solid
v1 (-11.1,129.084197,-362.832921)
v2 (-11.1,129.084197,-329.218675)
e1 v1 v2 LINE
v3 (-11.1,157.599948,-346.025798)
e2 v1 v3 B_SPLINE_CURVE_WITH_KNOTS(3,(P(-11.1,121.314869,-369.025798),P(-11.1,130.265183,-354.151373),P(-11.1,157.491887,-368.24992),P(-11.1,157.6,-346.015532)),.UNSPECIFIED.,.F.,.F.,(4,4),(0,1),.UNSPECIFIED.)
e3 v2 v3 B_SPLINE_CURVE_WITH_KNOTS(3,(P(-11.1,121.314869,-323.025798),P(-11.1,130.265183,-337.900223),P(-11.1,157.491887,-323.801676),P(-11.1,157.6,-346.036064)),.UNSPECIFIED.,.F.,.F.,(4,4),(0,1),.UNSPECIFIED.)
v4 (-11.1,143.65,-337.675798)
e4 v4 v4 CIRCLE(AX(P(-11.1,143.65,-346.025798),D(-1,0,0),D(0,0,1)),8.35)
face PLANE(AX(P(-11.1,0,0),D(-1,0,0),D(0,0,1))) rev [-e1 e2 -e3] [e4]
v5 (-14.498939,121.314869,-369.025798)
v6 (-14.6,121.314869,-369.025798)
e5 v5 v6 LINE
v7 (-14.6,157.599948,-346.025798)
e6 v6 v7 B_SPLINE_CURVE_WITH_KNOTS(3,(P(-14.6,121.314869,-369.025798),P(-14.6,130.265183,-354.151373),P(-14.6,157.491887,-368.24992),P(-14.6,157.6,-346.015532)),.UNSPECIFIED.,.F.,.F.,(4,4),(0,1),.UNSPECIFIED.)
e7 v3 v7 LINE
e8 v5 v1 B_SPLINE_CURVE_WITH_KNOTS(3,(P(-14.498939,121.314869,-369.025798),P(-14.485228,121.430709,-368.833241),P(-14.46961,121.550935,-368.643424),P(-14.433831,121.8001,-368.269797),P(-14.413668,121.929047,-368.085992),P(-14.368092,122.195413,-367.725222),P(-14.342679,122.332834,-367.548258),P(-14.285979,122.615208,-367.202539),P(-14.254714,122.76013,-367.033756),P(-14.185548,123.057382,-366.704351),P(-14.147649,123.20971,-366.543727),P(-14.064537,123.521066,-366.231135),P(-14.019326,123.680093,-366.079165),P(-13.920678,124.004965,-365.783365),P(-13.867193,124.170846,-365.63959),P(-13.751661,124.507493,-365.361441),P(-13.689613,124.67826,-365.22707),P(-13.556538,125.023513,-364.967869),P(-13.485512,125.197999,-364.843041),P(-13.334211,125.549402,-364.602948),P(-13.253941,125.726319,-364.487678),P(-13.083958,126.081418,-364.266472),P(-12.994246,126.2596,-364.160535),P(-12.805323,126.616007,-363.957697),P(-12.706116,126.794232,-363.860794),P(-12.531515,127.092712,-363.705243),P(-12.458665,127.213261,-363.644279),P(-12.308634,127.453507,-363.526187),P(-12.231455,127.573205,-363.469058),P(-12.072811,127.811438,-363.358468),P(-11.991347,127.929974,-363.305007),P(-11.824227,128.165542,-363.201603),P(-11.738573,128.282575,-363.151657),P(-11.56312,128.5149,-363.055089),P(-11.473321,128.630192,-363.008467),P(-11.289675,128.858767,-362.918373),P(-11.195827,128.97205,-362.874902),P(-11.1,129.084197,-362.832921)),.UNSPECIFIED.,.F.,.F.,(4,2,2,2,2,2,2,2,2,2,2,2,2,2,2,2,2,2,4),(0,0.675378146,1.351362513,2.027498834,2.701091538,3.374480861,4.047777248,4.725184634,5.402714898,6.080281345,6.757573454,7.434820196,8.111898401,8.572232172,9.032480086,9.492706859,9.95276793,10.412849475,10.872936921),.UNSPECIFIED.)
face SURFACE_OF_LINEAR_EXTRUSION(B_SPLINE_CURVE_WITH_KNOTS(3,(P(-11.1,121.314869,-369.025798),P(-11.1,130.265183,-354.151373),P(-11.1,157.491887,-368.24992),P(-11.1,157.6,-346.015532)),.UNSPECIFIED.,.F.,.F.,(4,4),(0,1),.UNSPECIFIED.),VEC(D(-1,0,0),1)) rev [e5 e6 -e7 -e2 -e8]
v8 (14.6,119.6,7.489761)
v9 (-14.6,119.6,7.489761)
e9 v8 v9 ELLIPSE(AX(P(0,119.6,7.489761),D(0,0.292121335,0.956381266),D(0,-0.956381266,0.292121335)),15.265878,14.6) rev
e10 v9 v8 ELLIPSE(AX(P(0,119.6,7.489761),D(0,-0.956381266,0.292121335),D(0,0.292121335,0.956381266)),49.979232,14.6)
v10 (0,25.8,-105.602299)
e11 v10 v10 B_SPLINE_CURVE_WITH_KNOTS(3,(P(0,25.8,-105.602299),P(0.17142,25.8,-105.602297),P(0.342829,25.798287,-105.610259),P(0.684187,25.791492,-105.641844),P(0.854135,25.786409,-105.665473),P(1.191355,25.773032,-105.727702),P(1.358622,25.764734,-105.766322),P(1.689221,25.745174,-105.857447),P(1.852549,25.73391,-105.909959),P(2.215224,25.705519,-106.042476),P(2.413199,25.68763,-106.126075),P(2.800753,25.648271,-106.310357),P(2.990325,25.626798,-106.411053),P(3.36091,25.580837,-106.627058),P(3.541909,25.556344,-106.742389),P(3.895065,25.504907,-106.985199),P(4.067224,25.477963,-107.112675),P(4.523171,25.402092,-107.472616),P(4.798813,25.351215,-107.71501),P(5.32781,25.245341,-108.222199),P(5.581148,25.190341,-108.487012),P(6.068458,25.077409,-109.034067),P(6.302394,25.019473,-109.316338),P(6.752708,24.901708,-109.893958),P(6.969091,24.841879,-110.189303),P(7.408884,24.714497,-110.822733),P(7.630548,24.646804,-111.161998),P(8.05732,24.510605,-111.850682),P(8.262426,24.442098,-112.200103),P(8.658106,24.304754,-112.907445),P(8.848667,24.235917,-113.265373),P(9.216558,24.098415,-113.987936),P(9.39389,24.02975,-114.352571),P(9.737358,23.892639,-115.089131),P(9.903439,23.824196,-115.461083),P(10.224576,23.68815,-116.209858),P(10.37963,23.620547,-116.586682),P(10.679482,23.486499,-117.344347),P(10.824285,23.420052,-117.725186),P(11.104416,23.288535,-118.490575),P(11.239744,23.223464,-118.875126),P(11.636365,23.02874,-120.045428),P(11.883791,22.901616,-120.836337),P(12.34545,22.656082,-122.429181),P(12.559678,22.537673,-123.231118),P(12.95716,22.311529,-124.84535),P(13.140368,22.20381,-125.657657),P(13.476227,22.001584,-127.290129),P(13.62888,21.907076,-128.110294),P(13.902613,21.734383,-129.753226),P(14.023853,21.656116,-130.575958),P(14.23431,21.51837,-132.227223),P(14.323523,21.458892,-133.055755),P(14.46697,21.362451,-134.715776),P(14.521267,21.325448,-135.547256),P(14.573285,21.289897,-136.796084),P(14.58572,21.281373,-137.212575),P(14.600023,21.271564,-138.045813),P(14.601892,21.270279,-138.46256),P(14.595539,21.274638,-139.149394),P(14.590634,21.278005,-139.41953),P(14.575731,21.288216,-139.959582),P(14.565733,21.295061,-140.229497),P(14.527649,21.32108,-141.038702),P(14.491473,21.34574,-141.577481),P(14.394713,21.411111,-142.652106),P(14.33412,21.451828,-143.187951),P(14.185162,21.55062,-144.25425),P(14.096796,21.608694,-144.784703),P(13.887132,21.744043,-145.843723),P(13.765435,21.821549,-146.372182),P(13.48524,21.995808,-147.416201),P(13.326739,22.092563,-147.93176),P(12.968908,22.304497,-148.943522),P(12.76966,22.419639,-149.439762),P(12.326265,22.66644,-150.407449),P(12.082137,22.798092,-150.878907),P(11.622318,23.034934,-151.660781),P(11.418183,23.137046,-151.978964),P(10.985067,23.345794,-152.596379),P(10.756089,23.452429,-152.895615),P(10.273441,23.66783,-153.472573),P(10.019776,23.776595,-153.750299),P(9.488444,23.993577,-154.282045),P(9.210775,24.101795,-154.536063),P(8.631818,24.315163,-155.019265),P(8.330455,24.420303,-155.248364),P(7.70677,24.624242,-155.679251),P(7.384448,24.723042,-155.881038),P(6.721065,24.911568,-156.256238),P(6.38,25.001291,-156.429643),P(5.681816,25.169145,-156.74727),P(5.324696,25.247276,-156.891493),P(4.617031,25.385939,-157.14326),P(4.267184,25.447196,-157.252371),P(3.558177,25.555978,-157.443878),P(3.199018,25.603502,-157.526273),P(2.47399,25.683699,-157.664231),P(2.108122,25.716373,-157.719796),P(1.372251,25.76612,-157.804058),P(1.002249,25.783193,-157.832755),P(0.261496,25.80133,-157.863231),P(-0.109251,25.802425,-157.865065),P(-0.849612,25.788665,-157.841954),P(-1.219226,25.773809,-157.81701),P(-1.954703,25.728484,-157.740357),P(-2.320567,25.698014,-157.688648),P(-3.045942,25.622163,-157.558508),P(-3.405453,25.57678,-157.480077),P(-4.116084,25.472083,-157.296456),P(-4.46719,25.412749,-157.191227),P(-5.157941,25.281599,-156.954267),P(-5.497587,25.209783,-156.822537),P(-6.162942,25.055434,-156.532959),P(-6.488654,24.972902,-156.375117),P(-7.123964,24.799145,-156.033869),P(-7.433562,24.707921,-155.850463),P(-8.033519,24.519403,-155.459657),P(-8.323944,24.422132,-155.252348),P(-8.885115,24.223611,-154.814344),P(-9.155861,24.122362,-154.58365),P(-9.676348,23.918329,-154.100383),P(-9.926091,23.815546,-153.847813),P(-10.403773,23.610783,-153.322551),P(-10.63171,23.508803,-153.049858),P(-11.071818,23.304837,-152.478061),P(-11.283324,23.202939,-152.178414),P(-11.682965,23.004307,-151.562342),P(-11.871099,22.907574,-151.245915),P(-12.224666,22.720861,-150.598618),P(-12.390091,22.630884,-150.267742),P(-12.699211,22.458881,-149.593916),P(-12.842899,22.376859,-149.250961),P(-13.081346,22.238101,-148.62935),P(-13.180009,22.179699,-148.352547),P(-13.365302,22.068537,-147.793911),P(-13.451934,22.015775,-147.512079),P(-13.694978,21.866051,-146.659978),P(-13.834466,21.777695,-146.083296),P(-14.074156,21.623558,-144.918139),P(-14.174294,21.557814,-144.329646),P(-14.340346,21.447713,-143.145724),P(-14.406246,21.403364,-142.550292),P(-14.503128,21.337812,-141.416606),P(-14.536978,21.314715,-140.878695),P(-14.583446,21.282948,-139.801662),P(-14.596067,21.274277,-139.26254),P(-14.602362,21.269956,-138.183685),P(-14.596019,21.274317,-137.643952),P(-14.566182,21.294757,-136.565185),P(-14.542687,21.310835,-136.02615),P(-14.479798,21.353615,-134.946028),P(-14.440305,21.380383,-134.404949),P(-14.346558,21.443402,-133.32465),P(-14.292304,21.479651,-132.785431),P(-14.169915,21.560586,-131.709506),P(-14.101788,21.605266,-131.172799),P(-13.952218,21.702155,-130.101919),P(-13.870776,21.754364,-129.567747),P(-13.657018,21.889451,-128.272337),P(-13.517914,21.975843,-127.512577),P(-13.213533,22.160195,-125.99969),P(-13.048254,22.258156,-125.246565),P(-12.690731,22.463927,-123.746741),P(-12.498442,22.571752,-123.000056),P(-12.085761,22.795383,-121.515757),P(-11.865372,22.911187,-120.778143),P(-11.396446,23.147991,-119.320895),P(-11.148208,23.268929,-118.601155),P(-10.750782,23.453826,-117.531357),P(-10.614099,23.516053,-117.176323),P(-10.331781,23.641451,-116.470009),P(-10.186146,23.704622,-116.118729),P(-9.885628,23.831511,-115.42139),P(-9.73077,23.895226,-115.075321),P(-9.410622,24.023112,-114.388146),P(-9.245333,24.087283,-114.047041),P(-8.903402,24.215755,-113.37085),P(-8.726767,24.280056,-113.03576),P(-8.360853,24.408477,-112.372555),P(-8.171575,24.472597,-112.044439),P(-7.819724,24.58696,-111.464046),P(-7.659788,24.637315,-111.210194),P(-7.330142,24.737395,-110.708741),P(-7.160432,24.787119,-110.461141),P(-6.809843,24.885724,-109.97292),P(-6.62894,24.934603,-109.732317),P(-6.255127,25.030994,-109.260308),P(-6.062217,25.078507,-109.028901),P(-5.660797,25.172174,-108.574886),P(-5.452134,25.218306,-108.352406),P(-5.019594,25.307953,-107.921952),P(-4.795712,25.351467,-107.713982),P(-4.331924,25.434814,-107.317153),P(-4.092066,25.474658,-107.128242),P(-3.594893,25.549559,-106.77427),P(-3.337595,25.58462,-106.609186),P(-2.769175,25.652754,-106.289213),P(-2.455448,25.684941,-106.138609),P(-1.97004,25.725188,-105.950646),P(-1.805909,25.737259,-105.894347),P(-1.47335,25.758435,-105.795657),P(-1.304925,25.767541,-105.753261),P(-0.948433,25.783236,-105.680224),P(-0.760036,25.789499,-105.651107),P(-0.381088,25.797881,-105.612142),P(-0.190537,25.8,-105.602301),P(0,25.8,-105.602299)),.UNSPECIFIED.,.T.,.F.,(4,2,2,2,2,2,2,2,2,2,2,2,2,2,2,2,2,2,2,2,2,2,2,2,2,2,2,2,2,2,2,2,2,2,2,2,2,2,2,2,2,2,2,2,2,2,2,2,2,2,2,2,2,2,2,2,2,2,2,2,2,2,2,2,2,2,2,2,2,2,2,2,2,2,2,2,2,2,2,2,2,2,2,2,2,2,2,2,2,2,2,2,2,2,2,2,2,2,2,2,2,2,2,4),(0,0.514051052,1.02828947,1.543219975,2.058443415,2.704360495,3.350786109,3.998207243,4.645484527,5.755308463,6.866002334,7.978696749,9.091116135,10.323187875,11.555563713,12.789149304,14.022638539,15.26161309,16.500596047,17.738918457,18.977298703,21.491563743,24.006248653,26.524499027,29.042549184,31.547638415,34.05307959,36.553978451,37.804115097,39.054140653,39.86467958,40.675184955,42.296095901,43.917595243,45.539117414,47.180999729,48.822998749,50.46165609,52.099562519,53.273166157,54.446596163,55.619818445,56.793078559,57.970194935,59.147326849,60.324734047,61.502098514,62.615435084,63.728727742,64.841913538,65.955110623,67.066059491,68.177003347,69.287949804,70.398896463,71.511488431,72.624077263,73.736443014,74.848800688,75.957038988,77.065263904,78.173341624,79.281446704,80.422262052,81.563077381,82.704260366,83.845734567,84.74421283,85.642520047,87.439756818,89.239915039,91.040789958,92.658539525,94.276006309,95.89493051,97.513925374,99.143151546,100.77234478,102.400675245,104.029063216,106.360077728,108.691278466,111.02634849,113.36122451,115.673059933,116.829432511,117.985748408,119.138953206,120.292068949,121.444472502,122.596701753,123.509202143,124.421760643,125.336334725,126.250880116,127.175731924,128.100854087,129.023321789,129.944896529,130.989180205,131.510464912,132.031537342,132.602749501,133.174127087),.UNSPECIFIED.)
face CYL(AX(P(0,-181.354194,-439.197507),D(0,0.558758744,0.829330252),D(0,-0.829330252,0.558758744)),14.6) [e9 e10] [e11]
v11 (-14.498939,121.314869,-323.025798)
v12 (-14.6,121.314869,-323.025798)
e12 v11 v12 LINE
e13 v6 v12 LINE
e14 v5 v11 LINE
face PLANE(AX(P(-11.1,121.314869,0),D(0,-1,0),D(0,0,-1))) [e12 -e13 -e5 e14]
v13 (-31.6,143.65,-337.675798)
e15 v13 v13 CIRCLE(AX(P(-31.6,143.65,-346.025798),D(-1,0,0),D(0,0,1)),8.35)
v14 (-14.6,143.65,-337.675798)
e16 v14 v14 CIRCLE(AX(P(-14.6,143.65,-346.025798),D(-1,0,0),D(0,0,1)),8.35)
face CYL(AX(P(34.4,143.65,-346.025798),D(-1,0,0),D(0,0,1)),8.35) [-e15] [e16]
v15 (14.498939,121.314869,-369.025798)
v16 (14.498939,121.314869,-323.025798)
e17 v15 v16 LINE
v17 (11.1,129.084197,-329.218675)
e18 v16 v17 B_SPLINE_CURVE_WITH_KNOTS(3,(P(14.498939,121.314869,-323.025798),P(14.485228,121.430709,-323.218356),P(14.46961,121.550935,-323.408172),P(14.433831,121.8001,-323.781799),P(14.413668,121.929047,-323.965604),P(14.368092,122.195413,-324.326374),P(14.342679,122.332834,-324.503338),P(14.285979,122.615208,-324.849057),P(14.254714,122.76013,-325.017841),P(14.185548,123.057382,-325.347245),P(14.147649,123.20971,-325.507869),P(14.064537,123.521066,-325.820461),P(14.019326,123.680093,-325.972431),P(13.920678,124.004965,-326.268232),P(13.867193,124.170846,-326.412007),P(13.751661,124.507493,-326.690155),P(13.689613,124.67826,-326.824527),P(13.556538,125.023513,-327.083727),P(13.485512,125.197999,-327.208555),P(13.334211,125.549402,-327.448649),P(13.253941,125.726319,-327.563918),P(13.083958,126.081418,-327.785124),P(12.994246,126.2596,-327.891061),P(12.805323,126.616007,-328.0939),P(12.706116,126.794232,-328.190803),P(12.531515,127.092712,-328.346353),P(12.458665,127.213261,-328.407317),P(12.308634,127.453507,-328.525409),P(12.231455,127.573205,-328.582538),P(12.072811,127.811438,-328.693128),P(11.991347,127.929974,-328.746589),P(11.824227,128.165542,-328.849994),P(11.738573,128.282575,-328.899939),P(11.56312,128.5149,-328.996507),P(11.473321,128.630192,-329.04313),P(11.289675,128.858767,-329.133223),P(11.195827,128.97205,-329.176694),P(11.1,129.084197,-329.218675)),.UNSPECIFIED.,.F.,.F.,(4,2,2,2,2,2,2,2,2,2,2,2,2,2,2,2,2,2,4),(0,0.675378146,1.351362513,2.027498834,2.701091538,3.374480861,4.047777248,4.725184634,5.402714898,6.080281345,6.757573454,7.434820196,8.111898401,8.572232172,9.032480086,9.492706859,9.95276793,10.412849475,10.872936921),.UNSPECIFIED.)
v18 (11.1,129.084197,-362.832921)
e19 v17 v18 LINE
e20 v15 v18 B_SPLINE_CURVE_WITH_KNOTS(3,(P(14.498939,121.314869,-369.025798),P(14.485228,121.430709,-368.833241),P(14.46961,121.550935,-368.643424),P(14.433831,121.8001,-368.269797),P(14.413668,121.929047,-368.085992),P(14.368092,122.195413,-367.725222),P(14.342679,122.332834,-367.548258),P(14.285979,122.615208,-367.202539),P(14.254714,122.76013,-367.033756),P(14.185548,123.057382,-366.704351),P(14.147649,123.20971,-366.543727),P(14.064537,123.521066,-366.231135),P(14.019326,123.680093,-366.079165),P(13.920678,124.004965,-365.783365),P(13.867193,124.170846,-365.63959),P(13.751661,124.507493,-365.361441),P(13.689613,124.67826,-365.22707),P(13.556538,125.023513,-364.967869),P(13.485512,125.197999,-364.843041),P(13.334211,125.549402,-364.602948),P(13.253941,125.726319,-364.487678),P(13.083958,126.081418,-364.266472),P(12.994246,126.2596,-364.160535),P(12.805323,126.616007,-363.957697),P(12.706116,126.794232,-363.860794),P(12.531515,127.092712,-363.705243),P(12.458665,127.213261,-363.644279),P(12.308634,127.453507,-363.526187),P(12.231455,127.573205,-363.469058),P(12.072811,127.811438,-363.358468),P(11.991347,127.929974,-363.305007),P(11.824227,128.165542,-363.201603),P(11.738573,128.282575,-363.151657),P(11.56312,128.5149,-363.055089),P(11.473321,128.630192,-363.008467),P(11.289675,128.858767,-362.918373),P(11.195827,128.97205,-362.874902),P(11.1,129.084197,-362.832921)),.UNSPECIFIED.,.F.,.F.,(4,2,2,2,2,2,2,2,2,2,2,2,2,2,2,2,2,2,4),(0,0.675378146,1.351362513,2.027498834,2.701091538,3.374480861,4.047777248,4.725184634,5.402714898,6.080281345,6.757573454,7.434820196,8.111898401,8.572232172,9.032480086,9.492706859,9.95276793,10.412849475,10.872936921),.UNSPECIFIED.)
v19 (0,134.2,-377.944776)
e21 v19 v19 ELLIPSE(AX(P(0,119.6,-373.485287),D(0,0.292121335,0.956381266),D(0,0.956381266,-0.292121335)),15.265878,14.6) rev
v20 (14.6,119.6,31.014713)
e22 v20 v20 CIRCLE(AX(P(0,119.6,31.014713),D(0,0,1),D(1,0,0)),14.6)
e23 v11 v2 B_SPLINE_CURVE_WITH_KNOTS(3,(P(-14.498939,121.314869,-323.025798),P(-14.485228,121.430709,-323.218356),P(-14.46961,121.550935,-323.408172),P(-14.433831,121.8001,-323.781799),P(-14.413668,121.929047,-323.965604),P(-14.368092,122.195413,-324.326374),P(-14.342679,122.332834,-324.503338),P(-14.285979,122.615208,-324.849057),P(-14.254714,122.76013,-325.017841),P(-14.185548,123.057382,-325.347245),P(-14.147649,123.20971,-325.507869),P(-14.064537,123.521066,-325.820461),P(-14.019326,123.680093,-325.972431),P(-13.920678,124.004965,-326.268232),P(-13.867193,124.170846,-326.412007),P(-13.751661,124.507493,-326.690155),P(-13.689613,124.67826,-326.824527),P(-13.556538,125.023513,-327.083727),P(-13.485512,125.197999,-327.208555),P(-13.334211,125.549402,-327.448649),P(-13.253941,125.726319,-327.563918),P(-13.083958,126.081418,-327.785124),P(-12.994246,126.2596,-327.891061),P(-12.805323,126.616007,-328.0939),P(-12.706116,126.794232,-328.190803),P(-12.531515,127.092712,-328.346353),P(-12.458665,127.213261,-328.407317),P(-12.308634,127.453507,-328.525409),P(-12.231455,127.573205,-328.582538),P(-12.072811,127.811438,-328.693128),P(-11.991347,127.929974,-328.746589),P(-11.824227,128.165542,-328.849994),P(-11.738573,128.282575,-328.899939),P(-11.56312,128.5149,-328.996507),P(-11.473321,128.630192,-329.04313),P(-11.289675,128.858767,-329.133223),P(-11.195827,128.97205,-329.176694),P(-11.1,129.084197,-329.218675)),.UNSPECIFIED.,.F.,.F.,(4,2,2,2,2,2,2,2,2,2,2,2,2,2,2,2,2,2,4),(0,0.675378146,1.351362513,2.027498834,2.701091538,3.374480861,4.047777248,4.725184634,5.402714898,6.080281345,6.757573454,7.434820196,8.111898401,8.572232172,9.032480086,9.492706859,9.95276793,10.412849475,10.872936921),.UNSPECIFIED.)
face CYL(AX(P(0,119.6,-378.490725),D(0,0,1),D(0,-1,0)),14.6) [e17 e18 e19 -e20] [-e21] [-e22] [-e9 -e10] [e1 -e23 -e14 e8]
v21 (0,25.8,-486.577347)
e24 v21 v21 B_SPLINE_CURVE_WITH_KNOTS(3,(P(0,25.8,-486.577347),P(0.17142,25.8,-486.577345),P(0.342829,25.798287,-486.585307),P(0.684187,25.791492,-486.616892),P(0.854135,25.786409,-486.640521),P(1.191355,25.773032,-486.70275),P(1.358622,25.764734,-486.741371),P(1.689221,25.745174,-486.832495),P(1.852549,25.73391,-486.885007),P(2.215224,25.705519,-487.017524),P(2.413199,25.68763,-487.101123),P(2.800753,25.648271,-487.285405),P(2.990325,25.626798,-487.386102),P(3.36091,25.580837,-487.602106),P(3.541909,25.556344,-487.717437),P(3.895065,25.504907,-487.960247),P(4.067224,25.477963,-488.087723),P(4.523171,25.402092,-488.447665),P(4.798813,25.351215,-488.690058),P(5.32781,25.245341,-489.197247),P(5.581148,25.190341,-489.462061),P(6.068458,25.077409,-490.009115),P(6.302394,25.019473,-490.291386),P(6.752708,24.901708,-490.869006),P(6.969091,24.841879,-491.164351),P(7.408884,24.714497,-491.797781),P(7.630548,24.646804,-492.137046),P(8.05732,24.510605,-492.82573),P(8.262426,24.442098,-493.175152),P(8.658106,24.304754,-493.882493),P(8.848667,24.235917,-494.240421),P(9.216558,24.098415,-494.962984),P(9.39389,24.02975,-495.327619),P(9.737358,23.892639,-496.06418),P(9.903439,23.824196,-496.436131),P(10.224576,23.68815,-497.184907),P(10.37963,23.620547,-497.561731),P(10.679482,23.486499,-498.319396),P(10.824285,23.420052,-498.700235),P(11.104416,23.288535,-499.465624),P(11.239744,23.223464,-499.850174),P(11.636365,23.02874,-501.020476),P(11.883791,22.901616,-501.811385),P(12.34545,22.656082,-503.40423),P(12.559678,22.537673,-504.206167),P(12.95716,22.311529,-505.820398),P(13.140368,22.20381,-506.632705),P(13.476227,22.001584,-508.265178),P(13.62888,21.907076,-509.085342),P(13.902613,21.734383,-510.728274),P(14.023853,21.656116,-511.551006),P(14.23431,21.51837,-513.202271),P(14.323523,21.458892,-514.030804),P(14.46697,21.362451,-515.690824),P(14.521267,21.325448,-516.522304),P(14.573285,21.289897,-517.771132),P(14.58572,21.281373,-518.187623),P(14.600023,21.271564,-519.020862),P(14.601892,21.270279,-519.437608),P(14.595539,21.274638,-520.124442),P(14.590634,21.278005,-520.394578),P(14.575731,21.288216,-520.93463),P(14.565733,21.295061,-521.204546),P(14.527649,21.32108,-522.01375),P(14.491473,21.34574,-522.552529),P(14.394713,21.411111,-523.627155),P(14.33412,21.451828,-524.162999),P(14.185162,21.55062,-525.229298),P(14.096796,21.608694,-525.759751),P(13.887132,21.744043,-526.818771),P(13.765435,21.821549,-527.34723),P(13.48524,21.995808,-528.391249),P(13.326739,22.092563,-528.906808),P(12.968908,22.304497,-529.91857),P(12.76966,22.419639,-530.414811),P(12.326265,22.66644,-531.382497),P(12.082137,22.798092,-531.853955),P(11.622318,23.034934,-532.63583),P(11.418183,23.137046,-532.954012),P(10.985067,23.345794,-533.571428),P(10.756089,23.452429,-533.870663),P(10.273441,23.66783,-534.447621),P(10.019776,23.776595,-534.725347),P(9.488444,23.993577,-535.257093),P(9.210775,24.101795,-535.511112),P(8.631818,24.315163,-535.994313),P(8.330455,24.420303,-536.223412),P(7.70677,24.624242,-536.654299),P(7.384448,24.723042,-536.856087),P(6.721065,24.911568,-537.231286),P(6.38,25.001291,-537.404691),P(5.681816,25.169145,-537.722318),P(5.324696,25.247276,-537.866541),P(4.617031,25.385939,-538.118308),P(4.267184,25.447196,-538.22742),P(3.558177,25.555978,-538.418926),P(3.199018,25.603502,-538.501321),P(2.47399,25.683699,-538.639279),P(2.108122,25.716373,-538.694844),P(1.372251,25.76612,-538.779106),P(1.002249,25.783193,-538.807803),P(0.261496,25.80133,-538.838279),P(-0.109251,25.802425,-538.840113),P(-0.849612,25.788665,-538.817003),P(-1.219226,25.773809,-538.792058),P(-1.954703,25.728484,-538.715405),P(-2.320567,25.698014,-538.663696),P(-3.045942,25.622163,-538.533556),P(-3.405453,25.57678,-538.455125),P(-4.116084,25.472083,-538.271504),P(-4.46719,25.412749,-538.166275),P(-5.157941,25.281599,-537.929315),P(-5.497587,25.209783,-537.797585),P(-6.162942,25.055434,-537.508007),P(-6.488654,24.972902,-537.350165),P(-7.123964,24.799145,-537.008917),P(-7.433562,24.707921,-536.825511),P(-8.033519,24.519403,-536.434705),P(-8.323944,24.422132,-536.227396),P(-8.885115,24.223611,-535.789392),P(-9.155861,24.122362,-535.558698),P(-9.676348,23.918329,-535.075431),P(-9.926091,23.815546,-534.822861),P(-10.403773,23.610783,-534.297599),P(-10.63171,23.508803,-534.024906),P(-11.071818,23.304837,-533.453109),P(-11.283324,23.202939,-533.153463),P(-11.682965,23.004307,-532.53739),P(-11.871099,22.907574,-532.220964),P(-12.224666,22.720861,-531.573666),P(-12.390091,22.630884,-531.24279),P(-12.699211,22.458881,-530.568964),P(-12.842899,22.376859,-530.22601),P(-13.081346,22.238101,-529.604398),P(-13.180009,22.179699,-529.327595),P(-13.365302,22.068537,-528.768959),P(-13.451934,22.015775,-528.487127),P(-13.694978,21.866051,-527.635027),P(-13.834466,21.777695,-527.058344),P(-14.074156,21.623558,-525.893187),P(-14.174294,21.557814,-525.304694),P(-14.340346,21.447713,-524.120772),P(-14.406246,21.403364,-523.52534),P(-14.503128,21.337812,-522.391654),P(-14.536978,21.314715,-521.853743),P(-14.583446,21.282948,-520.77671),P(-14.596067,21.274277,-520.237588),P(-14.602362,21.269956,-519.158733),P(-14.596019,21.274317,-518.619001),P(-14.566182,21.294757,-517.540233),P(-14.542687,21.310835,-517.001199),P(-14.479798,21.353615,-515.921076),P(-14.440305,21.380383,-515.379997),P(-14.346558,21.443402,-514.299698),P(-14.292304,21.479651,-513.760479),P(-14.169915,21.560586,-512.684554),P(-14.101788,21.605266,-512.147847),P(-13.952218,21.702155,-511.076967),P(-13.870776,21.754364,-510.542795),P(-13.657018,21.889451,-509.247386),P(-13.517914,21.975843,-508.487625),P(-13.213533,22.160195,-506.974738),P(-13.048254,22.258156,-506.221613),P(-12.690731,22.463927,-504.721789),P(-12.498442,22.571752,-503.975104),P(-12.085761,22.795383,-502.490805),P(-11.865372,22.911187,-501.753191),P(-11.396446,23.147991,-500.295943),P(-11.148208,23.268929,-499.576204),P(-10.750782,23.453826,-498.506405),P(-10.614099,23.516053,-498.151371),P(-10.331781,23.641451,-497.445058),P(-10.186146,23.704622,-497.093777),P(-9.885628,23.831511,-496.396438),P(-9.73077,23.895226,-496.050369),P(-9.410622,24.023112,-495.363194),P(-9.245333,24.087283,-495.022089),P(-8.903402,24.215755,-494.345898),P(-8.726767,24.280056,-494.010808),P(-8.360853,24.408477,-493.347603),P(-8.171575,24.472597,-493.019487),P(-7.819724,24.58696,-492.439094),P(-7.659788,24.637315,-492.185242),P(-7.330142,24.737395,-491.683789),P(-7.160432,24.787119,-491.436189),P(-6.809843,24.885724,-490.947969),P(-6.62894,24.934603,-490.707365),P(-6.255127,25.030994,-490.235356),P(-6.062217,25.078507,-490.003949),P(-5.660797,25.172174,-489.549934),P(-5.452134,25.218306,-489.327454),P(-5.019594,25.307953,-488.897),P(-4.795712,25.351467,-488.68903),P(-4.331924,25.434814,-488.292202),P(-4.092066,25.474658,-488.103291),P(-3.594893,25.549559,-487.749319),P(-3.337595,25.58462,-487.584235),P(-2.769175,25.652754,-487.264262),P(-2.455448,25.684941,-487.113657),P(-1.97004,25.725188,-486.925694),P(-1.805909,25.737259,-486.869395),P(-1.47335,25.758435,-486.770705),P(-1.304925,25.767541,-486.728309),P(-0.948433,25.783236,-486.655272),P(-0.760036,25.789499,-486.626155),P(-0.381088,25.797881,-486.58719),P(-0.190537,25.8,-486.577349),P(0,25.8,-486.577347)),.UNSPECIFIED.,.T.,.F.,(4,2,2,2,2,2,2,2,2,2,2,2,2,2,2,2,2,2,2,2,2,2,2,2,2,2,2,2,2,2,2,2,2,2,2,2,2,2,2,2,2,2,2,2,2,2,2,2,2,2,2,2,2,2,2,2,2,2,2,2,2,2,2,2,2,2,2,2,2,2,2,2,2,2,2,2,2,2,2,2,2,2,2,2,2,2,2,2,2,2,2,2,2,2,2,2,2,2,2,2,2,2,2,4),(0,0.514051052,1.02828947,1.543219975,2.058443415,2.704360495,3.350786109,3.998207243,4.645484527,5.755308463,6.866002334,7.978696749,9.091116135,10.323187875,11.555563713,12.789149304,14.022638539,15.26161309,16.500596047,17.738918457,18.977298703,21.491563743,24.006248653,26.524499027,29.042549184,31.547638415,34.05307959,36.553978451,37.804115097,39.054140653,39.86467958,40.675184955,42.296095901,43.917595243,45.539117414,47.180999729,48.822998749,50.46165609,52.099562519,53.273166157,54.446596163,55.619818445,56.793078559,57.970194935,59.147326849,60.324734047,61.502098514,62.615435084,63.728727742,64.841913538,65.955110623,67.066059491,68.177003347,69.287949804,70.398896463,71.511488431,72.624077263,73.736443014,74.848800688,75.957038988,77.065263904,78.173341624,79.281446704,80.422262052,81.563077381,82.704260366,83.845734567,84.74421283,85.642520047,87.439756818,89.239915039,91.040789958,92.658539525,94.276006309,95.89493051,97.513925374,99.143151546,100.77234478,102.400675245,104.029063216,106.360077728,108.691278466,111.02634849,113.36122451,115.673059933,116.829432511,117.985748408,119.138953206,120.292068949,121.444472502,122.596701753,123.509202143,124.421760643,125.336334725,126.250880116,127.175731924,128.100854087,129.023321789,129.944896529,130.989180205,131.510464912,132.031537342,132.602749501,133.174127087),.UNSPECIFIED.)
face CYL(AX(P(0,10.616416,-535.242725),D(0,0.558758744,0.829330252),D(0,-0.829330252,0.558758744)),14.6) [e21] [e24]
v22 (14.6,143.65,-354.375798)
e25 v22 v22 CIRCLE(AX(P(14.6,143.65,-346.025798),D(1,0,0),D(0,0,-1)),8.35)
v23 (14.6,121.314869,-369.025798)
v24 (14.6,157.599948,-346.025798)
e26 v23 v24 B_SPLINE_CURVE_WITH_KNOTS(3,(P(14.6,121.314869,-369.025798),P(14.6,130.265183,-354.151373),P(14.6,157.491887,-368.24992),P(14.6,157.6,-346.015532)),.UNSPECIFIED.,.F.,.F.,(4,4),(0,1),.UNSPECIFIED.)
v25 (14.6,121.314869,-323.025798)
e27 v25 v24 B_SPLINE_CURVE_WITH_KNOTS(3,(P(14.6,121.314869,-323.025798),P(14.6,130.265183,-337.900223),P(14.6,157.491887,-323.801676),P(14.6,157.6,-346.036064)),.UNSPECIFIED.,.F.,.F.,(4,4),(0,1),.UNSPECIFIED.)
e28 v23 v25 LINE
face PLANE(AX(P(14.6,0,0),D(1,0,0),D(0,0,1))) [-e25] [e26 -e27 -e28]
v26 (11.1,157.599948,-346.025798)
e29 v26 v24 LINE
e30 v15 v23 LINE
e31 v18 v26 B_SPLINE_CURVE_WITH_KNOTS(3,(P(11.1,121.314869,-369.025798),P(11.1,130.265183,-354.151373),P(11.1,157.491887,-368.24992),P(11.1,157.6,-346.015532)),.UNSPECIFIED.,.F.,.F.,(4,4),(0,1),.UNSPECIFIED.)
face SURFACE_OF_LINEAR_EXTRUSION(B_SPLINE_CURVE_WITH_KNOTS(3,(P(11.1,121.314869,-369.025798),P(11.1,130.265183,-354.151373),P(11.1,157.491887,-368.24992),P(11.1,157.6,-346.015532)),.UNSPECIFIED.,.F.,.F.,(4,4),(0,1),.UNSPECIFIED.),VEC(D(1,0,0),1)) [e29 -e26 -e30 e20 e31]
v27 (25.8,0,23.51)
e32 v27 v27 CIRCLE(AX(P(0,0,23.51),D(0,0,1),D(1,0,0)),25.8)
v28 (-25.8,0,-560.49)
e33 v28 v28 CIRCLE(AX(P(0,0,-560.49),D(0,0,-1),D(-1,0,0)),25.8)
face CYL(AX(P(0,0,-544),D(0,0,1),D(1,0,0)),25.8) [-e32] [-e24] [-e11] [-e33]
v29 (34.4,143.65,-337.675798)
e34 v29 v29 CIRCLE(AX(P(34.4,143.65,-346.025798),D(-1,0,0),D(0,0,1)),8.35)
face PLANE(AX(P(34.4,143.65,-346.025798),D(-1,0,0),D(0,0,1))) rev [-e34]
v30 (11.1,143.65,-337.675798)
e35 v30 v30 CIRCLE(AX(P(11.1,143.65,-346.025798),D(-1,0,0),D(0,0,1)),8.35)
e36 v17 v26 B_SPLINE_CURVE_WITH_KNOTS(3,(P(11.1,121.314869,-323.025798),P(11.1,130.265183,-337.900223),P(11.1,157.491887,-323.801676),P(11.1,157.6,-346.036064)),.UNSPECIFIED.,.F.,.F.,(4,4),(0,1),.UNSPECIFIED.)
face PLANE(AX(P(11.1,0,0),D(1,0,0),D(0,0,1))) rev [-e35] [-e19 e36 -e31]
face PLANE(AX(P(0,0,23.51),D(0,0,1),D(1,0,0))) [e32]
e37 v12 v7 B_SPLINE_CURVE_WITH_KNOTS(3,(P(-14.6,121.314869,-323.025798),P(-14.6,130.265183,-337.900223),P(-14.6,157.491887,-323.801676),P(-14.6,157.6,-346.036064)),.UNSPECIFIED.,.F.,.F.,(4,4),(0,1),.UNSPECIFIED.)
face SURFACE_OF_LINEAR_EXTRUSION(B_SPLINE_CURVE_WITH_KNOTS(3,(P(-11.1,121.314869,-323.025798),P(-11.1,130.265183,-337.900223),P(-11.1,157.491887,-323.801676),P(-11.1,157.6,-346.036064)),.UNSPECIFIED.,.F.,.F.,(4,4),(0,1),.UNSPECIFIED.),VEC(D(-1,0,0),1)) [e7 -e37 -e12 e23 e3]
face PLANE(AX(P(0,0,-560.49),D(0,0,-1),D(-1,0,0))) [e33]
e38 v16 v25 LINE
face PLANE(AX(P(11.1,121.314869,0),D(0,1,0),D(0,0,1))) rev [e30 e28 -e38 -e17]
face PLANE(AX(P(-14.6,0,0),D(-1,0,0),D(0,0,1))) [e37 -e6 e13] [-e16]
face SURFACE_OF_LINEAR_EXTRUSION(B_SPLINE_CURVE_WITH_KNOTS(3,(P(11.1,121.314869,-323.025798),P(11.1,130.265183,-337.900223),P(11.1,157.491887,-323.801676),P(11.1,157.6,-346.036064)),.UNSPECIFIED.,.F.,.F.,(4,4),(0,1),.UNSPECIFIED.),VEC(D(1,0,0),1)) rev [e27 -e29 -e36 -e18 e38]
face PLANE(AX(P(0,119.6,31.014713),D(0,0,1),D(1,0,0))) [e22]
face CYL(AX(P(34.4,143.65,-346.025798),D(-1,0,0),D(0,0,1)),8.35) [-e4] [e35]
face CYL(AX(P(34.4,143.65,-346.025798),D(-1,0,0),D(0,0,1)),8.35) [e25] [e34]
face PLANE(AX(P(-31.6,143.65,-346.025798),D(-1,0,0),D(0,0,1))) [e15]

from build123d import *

# Parameters (mm, degrees)
SKETCH1_R                = 25.8
BOSS_EXTRUDE1_DEPTH      = 544
SKETCH6_R                = 14.6
BOSS_EXTRUDE2_REACH      = 541.822
BOSS_EXTRUDE2_END_RADIUS = 25.8
SKETCH4_R                = 14.6
BOSS_EXTRUDE3_START      = -3.5
BOSS_EXTRUDE3_OUTLINE_R  = 8.35
BOSS_EXTRUDE3_DEPTH      = 3.5
BOSS_EXTRUDE4_START      = 17
SKETCH7_3_R              = 8.35
BOSS_EXTRUDE4_DEPTH      = 66
SKETCH9_R                = 25.8
BOSS_EXTRUDE5_DEPTH      = 16.49
BOSS_EXTRUDE6_START      = 23.51
SKETCH10_R               = 25.8
BOSS_EXTRUDE6_DEPTH      = 23.51
BOSS_EXTRUDE7_START      = 4.5
SKETCH11_R               = 14.6
BOSS_EXTRUDE7_DEPTH      = 4.5


# Read off the part's stored shape, not the designer's step: Boss-Extrude3
with BuildPart() as part:
    # Sketch1 → Boss-Extrude1 (new body)
    with BuildSketch(Plane.XY):
        Circle(SKETCH1_R)
    extrude(amount=-BOSS_EXTRUDE1_DEPTH)

    # Sweep2: sweep along a path in Sketch2
    with BuildLine(Plane(origin=(0, 0, 0), x_dir=(0, 0, -1), z_dir=(1, 0, 0))) as sweep2_path:
        Line((535.242725219, 10.616416132), (373.485286901, 119.6))
        Line((373.485286901, 119.6), (-26.514713099, 119.6))
    # Sketch6 → Sweep2 (sweep)
    with BuildSketch(Plane(origin=(0, 10.616416132, -535.242725219), x_dir=(1, 0, 0), z_dir=(0, 0.5587587437797145, 0.8293302516185669))):
        Circle(SKETCH6_R)
    sweep(path=sweep2_path.line, transition=Transition.RIGHT)

    # Boss-Extrude2: up to this cylinder (the profile starts outside it)
    boss_extrude2_end = Plane(origin=(0, 0, 7.489761), z_dir=(0, 0, 1)) * Cylinder(BOSS_EXTRUDE2_END_RADIUS, 1136.244, mode=Mode.PRIVATE)
    # Sketch4 → Boss-Extrude2 (add, up to the surface)
    with BuildSketch(Plane(origin=(0, 296.142134203, -111.454966642), x_dir=(1, 0, 0), z_dir=(0, 0.5587587437797145, 0.8293302516185669)), mode=Mode.PRIVATE) as boss_extrude2_sk1:
        with Locations(Location((0, -212.87313933, 0), (0, 0, 270))):
            Circle(SKETCH4_R)
    boss_extrude2_tool1 = extrude(boss_extrude2_sk1.sketch, amount=-BOSS_EXTRUDE2_REACH, mode=Mode.PRIVATE) - boss_extrude2_end
    add(boss_extrude2_tool1.solids().sort_by_distance((0, 119.6, 7.489761))[0])

    # Boss-Extrude3 outline → Boss-Extrude3 (add)
    with BuildSketch(Plane.ZY.offset(14.6).offset(BOSS_EXTRUDE3_START)):
        with BuildLine():
            add(Edge.make_bspline(
                [(-369.025798161, 121.314868638), (-354.153662916, 130.263805611), (-368.24558028, 157.483504956), (-346.0257981, 157.599948143)],
                knots=[0, 0, 0, 0, 0.999846057, 0.999846057, 0.999846057, 0.999846057], degree=3))
            Line((-369.025798161, 121.314868638), (-323.025798161, 121.314868638))
            add(Edge.make_bspline(
                [(-323.025798161, 121.314868638), (-337.897933379, 130.263805595), (-323.806016093, 157.483504857), (-346.0257981, 157.599948143)],
                knots=[0, 0, 0, 0, 0.999846056, 0.999846056, 0.999846056, 0.999846056], degree=3))
        make_face()
        with Locations((-346.025798161, 143.65)):
            Circle(BOSS_EXTRUDE3_OUTLINE_R, mode=Mode.SUBTRACT)
    boss_extrude3 = extrude(amount=BOSS_EXTRUDE3_DEPTH)

    # Mirror1: Boss-Extrude3 across plane
    add(boss_extrude3.mirror(Plane.ZY))

    # Sketch7<3> → Boss-Extrude4 (add)
    with BuildSketch(Plane.ZY.offset(14.6).offset(BOSS_EXTRUDE4_START)):
        with Locations((-346.025798161, 143.65)):
            Circle(SKETCH7_3_R)
    extrude(amount=-BOSS_EXTRUDE4_DEPTH)

    # Sketch9 → Boss-Extrude5 (add)
    with BuildSketch(Plane(origin=(0, 0, -544), x_dir=(-1, 0, 0), z_dir=(0, 0, -1))):
        with Locations(Location((0, 0, 0), (0, 0, 180))):
            Circle(SKETCH9_R)
    extrude(amount=BOSS_EXTRUDE5_DEPTH)

    # Sketch10 → Boss-Extrude6 (add)
    with BuildSketch(Plane.XY.offset(BOSS_EXTRUDE6_START)):
        Circle(SKETCH10_R)
    extrude(amount=-BOSS_EXTRUDE6_DEPTH)

    # Sketch11 → Boss-Extrude7 (add)
    with BuildSketch(Plane.XY.offset(26.514713099).offset(BOSS_EXTRUDE7_START)):
        with Locations((0, 119.6)):
            Circle(SKETCH11_R)
    extrude(amount=-BOSS_EXTRUDE7_DEPTH)


solid = part.part
